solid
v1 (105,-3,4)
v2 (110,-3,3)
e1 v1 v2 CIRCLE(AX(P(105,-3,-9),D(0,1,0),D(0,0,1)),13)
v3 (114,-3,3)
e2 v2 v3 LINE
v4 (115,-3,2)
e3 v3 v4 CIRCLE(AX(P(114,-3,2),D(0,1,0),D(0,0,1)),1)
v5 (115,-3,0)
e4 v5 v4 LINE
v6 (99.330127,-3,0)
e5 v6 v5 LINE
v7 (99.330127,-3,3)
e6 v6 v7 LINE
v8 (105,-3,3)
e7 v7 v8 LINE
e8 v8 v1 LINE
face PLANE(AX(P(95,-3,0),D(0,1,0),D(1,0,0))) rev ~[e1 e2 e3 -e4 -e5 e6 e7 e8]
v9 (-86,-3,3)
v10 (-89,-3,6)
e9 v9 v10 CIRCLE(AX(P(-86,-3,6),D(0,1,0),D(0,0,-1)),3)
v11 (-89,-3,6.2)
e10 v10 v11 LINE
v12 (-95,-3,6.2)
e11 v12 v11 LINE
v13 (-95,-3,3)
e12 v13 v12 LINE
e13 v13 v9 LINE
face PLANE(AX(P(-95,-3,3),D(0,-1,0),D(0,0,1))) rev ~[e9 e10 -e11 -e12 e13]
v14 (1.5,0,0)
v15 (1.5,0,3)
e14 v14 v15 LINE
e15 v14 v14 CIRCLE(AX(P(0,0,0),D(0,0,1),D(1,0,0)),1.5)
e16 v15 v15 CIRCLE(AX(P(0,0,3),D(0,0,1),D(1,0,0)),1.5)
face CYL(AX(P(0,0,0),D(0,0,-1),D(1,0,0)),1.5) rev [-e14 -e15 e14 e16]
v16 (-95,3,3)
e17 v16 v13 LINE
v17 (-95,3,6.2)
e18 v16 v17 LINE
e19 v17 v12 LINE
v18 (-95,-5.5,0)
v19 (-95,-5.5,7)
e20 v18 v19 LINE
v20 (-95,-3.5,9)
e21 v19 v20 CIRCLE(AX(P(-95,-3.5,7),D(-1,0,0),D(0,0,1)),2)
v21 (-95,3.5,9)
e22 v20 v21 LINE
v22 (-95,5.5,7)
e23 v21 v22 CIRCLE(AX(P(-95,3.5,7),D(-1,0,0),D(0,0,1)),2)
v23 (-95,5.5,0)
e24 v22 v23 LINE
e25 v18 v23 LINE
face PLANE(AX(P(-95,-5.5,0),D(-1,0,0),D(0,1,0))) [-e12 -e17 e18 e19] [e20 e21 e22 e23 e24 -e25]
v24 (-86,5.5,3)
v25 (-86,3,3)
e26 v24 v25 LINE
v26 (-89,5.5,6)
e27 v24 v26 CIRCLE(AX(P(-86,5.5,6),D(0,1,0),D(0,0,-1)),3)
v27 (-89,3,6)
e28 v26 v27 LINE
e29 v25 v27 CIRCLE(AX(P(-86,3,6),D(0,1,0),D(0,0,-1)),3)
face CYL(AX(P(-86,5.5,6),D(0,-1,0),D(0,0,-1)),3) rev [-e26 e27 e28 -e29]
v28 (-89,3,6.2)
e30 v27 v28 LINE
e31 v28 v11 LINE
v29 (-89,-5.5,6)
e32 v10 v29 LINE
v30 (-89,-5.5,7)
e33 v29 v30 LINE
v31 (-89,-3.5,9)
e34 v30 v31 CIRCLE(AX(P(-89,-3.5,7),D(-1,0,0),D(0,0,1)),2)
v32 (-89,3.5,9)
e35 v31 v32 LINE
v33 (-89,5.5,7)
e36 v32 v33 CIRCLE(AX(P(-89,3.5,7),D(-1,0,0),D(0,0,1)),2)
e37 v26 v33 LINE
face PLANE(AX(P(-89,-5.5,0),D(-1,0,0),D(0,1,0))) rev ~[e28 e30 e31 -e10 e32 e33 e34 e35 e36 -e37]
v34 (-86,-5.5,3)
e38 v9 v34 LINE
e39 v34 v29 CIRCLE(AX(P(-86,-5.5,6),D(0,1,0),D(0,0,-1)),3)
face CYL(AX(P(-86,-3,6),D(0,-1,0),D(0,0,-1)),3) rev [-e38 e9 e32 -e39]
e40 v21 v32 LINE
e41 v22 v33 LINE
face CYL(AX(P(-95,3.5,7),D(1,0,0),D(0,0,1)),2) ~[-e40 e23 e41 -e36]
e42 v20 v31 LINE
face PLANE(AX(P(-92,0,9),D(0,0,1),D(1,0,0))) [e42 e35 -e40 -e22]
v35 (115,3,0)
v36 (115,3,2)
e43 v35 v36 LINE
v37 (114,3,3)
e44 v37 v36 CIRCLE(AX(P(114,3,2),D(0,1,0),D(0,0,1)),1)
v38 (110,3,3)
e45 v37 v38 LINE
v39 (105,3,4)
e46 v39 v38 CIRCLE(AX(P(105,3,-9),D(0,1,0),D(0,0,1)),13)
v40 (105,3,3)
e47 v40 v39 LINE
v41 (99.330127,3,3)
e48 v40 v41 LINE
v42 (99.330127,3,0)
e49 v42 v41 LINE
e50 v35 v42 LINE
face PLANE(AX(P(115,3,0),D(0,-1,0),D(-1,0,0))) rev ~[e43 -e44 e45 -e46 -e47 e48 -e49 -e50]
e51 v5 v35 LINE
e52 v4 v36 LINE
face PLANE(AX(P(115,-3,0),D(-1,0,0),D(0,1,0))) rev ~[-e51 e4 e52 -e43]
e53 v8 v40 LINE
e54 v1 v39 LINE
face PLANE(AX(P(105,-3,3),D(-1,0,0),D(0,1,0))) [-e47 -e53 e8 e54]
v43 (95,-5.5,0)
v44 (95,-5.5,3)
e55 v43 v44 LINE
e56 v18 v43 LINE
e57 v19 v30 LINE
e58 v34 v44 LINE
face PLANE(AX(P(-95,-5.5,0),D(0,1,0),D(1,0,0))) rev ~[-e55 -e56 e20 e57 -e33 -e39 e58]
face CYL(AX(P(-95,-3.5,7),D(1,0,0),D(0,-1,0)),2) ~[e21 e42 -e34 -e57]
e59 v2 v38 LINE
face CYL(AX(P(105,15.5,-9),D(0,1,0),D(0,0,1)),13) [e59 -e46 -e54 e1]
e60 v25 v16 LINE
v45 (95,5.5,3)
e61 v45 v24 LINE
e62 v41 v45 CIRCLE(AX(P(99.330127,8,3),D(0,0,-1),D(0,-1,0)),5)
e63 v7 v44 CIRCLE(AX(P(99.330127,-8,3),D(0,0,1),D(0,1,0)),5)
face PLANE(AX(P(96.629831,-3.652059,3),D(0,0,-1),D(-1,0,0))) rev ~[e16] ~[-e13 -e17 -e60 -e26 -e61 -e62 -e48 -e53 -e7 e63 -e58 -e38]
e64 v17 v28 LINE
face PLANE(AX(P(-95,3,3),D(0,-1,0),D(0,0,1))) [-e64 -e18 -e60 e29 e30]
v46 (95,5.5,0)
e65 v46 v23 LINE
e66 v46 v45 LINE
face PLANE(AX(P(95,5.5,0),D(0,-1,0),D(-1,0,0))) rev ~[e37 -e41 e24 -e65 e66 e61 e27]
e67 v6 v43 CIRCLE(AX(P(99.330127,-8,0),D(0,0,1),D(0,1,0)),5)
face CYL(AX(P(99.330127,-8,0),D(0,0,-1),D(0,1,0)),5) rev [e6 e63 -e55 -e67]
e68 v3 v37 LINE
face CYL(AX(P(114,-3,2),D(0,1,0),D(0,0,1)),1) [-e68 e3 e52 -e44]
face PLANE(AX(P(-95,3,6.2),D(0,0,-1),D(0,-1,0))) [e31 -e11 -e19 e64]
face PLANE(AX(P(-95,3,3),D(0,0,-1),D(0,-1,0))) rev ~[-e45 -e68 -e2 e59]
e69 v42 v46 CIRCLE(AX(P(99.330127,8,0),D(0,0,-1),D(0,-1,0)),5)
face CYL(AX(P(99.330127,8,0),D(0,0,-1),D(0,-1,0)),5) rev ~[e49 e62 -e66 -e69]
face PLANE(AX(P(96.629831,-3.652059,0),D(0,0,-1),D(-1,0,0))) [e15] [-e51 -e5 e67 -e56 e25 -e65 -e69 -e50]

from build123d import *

# Parameters (mm, degrees)
F0_W         = 6
F0_H         = 11
F0_R         = 1.5
F1_DEPTH     = 3
F2_DEPTH     = 9
F3_W         = 6
F3_H         = 3.2
F4_DEPTH     = 15
F5_W         = 5
F5_H         = 6
F6_DEPTH     = 1
F7_T1_DEPTH  = 31
F8_R         = 3
F9_R         = 1
F10_T1_DEPTH = 3
F11_R        = 2


# Not quite as in the source:
# - a fillet or chamfer that OpenCascade refuses, or shapes differently, is made with other operations: its cross-section is extruded or revolved along the edge and cut away or added


with BuildPart() as f1:
    # F0 (on Top) → F1 (new body)
    with BuildSketch(Plane.XY):
        with Locations((-92, 0)):
            Rectangle(F0_W, F0_H)
        Polygon((-89, -5.5), (95, -5.5), (95, -3), (115, -3), (115, 3), (95, 3), (95, 5.5), (-89, 5.5), align=None)
        Circle(F0_R, mode=Mode.SUBTRACT)
    extrude(amount=F1_DEPTH)

    # F0 (on Top) → F2 (join)
    with BuildSketch(Plane.XY):
        with Locations((-92, 0)):
            Rectangle(F0_W, F0_H)
    extrude(amount=F2_DEPTH)

    # F3 (on face) → F4 (cut, symmetric)
    with BuildSketch(Plane(origin=(-95, 0, 0), x_dir=(0, -1, 0), z_dir=(-1, 0, 0))):
        with Locations((0, 4.6)):
            Rectangle(F3_W, F3_H)
    extrude(amount=F4_DEPTH, both=True, mode=Mode.SUBTRACT)

    # F5 (on face) → F6 (join)
    with BuildSketch(Plane.XY.offset(3)):
        with Locations((107.5, 0)):
            Rectangle(F5_W, F5_H)
    extrude(amount=F6_DEPTH)

    # F7: fillet of radius 13 on 1 edges, made by hand

    # F7_s2 → F7_t1 (cut)
    with BuildSketch(Plane.XZ.offset(-15.5)):
        with BuildLine():
            ThreePointArc((105, 4), (107.5495097568, 3.747548784), (110, 3))
            Line((110, 3), (110, 4))
            Line((110, 4), (105, 4))
        make_face()
    extrude(amount=F7_T1_DEPTH, mode=Mode.SUBTRACT)

    # F8
    f8_edges = [f1.edges().sort_by_distance(p)[0] for p in [
        (-89, -4.25, 3),
        (-89, 4.25, 3),
    ]]
    fillet(f8_edges, radius=F8_R)

    # F9
    f9_edges = [f1.edges().sort_by_distance(p)[0] for p in [
        (115, 0, 3),
    ]]
    fillet(f9_edges, radius=F9_R)

    # F10: fillet of radius 5 on 2 edges, made by hand

    # F10_s2 → F10_t1 (join)
    with BuildSketch(Plane.XY):
        with BuildLine():
            ThreePointArc((99.3301270189, -3), (96.8301270189, -3.6698729811), (95, -5.5))
            Line((95, -5.5), (95, -3))
            Line((95, -3), (99.3301270189, -3))
        make_face()
        with BuildLine():
            ThreePointArc((99.3301270189, 3), (96.8301270189, 3.6698729811), (95, 5.5))
            Line((95, 5.5), (95, 3))
            Line((95, 3), (99.3301270189, 3))
        make_face()
    extrude(amount=F10_T1_DEPTH)

    # F11
    f11_edges = [f1.edges().sort_by_distance(p)[0] for p in [
        (-92, 5.5, 9),
        (-92, -5.5, 9),
    ]]
    fillet(f11_edges, radius=F11_R)


solid = f1.part
